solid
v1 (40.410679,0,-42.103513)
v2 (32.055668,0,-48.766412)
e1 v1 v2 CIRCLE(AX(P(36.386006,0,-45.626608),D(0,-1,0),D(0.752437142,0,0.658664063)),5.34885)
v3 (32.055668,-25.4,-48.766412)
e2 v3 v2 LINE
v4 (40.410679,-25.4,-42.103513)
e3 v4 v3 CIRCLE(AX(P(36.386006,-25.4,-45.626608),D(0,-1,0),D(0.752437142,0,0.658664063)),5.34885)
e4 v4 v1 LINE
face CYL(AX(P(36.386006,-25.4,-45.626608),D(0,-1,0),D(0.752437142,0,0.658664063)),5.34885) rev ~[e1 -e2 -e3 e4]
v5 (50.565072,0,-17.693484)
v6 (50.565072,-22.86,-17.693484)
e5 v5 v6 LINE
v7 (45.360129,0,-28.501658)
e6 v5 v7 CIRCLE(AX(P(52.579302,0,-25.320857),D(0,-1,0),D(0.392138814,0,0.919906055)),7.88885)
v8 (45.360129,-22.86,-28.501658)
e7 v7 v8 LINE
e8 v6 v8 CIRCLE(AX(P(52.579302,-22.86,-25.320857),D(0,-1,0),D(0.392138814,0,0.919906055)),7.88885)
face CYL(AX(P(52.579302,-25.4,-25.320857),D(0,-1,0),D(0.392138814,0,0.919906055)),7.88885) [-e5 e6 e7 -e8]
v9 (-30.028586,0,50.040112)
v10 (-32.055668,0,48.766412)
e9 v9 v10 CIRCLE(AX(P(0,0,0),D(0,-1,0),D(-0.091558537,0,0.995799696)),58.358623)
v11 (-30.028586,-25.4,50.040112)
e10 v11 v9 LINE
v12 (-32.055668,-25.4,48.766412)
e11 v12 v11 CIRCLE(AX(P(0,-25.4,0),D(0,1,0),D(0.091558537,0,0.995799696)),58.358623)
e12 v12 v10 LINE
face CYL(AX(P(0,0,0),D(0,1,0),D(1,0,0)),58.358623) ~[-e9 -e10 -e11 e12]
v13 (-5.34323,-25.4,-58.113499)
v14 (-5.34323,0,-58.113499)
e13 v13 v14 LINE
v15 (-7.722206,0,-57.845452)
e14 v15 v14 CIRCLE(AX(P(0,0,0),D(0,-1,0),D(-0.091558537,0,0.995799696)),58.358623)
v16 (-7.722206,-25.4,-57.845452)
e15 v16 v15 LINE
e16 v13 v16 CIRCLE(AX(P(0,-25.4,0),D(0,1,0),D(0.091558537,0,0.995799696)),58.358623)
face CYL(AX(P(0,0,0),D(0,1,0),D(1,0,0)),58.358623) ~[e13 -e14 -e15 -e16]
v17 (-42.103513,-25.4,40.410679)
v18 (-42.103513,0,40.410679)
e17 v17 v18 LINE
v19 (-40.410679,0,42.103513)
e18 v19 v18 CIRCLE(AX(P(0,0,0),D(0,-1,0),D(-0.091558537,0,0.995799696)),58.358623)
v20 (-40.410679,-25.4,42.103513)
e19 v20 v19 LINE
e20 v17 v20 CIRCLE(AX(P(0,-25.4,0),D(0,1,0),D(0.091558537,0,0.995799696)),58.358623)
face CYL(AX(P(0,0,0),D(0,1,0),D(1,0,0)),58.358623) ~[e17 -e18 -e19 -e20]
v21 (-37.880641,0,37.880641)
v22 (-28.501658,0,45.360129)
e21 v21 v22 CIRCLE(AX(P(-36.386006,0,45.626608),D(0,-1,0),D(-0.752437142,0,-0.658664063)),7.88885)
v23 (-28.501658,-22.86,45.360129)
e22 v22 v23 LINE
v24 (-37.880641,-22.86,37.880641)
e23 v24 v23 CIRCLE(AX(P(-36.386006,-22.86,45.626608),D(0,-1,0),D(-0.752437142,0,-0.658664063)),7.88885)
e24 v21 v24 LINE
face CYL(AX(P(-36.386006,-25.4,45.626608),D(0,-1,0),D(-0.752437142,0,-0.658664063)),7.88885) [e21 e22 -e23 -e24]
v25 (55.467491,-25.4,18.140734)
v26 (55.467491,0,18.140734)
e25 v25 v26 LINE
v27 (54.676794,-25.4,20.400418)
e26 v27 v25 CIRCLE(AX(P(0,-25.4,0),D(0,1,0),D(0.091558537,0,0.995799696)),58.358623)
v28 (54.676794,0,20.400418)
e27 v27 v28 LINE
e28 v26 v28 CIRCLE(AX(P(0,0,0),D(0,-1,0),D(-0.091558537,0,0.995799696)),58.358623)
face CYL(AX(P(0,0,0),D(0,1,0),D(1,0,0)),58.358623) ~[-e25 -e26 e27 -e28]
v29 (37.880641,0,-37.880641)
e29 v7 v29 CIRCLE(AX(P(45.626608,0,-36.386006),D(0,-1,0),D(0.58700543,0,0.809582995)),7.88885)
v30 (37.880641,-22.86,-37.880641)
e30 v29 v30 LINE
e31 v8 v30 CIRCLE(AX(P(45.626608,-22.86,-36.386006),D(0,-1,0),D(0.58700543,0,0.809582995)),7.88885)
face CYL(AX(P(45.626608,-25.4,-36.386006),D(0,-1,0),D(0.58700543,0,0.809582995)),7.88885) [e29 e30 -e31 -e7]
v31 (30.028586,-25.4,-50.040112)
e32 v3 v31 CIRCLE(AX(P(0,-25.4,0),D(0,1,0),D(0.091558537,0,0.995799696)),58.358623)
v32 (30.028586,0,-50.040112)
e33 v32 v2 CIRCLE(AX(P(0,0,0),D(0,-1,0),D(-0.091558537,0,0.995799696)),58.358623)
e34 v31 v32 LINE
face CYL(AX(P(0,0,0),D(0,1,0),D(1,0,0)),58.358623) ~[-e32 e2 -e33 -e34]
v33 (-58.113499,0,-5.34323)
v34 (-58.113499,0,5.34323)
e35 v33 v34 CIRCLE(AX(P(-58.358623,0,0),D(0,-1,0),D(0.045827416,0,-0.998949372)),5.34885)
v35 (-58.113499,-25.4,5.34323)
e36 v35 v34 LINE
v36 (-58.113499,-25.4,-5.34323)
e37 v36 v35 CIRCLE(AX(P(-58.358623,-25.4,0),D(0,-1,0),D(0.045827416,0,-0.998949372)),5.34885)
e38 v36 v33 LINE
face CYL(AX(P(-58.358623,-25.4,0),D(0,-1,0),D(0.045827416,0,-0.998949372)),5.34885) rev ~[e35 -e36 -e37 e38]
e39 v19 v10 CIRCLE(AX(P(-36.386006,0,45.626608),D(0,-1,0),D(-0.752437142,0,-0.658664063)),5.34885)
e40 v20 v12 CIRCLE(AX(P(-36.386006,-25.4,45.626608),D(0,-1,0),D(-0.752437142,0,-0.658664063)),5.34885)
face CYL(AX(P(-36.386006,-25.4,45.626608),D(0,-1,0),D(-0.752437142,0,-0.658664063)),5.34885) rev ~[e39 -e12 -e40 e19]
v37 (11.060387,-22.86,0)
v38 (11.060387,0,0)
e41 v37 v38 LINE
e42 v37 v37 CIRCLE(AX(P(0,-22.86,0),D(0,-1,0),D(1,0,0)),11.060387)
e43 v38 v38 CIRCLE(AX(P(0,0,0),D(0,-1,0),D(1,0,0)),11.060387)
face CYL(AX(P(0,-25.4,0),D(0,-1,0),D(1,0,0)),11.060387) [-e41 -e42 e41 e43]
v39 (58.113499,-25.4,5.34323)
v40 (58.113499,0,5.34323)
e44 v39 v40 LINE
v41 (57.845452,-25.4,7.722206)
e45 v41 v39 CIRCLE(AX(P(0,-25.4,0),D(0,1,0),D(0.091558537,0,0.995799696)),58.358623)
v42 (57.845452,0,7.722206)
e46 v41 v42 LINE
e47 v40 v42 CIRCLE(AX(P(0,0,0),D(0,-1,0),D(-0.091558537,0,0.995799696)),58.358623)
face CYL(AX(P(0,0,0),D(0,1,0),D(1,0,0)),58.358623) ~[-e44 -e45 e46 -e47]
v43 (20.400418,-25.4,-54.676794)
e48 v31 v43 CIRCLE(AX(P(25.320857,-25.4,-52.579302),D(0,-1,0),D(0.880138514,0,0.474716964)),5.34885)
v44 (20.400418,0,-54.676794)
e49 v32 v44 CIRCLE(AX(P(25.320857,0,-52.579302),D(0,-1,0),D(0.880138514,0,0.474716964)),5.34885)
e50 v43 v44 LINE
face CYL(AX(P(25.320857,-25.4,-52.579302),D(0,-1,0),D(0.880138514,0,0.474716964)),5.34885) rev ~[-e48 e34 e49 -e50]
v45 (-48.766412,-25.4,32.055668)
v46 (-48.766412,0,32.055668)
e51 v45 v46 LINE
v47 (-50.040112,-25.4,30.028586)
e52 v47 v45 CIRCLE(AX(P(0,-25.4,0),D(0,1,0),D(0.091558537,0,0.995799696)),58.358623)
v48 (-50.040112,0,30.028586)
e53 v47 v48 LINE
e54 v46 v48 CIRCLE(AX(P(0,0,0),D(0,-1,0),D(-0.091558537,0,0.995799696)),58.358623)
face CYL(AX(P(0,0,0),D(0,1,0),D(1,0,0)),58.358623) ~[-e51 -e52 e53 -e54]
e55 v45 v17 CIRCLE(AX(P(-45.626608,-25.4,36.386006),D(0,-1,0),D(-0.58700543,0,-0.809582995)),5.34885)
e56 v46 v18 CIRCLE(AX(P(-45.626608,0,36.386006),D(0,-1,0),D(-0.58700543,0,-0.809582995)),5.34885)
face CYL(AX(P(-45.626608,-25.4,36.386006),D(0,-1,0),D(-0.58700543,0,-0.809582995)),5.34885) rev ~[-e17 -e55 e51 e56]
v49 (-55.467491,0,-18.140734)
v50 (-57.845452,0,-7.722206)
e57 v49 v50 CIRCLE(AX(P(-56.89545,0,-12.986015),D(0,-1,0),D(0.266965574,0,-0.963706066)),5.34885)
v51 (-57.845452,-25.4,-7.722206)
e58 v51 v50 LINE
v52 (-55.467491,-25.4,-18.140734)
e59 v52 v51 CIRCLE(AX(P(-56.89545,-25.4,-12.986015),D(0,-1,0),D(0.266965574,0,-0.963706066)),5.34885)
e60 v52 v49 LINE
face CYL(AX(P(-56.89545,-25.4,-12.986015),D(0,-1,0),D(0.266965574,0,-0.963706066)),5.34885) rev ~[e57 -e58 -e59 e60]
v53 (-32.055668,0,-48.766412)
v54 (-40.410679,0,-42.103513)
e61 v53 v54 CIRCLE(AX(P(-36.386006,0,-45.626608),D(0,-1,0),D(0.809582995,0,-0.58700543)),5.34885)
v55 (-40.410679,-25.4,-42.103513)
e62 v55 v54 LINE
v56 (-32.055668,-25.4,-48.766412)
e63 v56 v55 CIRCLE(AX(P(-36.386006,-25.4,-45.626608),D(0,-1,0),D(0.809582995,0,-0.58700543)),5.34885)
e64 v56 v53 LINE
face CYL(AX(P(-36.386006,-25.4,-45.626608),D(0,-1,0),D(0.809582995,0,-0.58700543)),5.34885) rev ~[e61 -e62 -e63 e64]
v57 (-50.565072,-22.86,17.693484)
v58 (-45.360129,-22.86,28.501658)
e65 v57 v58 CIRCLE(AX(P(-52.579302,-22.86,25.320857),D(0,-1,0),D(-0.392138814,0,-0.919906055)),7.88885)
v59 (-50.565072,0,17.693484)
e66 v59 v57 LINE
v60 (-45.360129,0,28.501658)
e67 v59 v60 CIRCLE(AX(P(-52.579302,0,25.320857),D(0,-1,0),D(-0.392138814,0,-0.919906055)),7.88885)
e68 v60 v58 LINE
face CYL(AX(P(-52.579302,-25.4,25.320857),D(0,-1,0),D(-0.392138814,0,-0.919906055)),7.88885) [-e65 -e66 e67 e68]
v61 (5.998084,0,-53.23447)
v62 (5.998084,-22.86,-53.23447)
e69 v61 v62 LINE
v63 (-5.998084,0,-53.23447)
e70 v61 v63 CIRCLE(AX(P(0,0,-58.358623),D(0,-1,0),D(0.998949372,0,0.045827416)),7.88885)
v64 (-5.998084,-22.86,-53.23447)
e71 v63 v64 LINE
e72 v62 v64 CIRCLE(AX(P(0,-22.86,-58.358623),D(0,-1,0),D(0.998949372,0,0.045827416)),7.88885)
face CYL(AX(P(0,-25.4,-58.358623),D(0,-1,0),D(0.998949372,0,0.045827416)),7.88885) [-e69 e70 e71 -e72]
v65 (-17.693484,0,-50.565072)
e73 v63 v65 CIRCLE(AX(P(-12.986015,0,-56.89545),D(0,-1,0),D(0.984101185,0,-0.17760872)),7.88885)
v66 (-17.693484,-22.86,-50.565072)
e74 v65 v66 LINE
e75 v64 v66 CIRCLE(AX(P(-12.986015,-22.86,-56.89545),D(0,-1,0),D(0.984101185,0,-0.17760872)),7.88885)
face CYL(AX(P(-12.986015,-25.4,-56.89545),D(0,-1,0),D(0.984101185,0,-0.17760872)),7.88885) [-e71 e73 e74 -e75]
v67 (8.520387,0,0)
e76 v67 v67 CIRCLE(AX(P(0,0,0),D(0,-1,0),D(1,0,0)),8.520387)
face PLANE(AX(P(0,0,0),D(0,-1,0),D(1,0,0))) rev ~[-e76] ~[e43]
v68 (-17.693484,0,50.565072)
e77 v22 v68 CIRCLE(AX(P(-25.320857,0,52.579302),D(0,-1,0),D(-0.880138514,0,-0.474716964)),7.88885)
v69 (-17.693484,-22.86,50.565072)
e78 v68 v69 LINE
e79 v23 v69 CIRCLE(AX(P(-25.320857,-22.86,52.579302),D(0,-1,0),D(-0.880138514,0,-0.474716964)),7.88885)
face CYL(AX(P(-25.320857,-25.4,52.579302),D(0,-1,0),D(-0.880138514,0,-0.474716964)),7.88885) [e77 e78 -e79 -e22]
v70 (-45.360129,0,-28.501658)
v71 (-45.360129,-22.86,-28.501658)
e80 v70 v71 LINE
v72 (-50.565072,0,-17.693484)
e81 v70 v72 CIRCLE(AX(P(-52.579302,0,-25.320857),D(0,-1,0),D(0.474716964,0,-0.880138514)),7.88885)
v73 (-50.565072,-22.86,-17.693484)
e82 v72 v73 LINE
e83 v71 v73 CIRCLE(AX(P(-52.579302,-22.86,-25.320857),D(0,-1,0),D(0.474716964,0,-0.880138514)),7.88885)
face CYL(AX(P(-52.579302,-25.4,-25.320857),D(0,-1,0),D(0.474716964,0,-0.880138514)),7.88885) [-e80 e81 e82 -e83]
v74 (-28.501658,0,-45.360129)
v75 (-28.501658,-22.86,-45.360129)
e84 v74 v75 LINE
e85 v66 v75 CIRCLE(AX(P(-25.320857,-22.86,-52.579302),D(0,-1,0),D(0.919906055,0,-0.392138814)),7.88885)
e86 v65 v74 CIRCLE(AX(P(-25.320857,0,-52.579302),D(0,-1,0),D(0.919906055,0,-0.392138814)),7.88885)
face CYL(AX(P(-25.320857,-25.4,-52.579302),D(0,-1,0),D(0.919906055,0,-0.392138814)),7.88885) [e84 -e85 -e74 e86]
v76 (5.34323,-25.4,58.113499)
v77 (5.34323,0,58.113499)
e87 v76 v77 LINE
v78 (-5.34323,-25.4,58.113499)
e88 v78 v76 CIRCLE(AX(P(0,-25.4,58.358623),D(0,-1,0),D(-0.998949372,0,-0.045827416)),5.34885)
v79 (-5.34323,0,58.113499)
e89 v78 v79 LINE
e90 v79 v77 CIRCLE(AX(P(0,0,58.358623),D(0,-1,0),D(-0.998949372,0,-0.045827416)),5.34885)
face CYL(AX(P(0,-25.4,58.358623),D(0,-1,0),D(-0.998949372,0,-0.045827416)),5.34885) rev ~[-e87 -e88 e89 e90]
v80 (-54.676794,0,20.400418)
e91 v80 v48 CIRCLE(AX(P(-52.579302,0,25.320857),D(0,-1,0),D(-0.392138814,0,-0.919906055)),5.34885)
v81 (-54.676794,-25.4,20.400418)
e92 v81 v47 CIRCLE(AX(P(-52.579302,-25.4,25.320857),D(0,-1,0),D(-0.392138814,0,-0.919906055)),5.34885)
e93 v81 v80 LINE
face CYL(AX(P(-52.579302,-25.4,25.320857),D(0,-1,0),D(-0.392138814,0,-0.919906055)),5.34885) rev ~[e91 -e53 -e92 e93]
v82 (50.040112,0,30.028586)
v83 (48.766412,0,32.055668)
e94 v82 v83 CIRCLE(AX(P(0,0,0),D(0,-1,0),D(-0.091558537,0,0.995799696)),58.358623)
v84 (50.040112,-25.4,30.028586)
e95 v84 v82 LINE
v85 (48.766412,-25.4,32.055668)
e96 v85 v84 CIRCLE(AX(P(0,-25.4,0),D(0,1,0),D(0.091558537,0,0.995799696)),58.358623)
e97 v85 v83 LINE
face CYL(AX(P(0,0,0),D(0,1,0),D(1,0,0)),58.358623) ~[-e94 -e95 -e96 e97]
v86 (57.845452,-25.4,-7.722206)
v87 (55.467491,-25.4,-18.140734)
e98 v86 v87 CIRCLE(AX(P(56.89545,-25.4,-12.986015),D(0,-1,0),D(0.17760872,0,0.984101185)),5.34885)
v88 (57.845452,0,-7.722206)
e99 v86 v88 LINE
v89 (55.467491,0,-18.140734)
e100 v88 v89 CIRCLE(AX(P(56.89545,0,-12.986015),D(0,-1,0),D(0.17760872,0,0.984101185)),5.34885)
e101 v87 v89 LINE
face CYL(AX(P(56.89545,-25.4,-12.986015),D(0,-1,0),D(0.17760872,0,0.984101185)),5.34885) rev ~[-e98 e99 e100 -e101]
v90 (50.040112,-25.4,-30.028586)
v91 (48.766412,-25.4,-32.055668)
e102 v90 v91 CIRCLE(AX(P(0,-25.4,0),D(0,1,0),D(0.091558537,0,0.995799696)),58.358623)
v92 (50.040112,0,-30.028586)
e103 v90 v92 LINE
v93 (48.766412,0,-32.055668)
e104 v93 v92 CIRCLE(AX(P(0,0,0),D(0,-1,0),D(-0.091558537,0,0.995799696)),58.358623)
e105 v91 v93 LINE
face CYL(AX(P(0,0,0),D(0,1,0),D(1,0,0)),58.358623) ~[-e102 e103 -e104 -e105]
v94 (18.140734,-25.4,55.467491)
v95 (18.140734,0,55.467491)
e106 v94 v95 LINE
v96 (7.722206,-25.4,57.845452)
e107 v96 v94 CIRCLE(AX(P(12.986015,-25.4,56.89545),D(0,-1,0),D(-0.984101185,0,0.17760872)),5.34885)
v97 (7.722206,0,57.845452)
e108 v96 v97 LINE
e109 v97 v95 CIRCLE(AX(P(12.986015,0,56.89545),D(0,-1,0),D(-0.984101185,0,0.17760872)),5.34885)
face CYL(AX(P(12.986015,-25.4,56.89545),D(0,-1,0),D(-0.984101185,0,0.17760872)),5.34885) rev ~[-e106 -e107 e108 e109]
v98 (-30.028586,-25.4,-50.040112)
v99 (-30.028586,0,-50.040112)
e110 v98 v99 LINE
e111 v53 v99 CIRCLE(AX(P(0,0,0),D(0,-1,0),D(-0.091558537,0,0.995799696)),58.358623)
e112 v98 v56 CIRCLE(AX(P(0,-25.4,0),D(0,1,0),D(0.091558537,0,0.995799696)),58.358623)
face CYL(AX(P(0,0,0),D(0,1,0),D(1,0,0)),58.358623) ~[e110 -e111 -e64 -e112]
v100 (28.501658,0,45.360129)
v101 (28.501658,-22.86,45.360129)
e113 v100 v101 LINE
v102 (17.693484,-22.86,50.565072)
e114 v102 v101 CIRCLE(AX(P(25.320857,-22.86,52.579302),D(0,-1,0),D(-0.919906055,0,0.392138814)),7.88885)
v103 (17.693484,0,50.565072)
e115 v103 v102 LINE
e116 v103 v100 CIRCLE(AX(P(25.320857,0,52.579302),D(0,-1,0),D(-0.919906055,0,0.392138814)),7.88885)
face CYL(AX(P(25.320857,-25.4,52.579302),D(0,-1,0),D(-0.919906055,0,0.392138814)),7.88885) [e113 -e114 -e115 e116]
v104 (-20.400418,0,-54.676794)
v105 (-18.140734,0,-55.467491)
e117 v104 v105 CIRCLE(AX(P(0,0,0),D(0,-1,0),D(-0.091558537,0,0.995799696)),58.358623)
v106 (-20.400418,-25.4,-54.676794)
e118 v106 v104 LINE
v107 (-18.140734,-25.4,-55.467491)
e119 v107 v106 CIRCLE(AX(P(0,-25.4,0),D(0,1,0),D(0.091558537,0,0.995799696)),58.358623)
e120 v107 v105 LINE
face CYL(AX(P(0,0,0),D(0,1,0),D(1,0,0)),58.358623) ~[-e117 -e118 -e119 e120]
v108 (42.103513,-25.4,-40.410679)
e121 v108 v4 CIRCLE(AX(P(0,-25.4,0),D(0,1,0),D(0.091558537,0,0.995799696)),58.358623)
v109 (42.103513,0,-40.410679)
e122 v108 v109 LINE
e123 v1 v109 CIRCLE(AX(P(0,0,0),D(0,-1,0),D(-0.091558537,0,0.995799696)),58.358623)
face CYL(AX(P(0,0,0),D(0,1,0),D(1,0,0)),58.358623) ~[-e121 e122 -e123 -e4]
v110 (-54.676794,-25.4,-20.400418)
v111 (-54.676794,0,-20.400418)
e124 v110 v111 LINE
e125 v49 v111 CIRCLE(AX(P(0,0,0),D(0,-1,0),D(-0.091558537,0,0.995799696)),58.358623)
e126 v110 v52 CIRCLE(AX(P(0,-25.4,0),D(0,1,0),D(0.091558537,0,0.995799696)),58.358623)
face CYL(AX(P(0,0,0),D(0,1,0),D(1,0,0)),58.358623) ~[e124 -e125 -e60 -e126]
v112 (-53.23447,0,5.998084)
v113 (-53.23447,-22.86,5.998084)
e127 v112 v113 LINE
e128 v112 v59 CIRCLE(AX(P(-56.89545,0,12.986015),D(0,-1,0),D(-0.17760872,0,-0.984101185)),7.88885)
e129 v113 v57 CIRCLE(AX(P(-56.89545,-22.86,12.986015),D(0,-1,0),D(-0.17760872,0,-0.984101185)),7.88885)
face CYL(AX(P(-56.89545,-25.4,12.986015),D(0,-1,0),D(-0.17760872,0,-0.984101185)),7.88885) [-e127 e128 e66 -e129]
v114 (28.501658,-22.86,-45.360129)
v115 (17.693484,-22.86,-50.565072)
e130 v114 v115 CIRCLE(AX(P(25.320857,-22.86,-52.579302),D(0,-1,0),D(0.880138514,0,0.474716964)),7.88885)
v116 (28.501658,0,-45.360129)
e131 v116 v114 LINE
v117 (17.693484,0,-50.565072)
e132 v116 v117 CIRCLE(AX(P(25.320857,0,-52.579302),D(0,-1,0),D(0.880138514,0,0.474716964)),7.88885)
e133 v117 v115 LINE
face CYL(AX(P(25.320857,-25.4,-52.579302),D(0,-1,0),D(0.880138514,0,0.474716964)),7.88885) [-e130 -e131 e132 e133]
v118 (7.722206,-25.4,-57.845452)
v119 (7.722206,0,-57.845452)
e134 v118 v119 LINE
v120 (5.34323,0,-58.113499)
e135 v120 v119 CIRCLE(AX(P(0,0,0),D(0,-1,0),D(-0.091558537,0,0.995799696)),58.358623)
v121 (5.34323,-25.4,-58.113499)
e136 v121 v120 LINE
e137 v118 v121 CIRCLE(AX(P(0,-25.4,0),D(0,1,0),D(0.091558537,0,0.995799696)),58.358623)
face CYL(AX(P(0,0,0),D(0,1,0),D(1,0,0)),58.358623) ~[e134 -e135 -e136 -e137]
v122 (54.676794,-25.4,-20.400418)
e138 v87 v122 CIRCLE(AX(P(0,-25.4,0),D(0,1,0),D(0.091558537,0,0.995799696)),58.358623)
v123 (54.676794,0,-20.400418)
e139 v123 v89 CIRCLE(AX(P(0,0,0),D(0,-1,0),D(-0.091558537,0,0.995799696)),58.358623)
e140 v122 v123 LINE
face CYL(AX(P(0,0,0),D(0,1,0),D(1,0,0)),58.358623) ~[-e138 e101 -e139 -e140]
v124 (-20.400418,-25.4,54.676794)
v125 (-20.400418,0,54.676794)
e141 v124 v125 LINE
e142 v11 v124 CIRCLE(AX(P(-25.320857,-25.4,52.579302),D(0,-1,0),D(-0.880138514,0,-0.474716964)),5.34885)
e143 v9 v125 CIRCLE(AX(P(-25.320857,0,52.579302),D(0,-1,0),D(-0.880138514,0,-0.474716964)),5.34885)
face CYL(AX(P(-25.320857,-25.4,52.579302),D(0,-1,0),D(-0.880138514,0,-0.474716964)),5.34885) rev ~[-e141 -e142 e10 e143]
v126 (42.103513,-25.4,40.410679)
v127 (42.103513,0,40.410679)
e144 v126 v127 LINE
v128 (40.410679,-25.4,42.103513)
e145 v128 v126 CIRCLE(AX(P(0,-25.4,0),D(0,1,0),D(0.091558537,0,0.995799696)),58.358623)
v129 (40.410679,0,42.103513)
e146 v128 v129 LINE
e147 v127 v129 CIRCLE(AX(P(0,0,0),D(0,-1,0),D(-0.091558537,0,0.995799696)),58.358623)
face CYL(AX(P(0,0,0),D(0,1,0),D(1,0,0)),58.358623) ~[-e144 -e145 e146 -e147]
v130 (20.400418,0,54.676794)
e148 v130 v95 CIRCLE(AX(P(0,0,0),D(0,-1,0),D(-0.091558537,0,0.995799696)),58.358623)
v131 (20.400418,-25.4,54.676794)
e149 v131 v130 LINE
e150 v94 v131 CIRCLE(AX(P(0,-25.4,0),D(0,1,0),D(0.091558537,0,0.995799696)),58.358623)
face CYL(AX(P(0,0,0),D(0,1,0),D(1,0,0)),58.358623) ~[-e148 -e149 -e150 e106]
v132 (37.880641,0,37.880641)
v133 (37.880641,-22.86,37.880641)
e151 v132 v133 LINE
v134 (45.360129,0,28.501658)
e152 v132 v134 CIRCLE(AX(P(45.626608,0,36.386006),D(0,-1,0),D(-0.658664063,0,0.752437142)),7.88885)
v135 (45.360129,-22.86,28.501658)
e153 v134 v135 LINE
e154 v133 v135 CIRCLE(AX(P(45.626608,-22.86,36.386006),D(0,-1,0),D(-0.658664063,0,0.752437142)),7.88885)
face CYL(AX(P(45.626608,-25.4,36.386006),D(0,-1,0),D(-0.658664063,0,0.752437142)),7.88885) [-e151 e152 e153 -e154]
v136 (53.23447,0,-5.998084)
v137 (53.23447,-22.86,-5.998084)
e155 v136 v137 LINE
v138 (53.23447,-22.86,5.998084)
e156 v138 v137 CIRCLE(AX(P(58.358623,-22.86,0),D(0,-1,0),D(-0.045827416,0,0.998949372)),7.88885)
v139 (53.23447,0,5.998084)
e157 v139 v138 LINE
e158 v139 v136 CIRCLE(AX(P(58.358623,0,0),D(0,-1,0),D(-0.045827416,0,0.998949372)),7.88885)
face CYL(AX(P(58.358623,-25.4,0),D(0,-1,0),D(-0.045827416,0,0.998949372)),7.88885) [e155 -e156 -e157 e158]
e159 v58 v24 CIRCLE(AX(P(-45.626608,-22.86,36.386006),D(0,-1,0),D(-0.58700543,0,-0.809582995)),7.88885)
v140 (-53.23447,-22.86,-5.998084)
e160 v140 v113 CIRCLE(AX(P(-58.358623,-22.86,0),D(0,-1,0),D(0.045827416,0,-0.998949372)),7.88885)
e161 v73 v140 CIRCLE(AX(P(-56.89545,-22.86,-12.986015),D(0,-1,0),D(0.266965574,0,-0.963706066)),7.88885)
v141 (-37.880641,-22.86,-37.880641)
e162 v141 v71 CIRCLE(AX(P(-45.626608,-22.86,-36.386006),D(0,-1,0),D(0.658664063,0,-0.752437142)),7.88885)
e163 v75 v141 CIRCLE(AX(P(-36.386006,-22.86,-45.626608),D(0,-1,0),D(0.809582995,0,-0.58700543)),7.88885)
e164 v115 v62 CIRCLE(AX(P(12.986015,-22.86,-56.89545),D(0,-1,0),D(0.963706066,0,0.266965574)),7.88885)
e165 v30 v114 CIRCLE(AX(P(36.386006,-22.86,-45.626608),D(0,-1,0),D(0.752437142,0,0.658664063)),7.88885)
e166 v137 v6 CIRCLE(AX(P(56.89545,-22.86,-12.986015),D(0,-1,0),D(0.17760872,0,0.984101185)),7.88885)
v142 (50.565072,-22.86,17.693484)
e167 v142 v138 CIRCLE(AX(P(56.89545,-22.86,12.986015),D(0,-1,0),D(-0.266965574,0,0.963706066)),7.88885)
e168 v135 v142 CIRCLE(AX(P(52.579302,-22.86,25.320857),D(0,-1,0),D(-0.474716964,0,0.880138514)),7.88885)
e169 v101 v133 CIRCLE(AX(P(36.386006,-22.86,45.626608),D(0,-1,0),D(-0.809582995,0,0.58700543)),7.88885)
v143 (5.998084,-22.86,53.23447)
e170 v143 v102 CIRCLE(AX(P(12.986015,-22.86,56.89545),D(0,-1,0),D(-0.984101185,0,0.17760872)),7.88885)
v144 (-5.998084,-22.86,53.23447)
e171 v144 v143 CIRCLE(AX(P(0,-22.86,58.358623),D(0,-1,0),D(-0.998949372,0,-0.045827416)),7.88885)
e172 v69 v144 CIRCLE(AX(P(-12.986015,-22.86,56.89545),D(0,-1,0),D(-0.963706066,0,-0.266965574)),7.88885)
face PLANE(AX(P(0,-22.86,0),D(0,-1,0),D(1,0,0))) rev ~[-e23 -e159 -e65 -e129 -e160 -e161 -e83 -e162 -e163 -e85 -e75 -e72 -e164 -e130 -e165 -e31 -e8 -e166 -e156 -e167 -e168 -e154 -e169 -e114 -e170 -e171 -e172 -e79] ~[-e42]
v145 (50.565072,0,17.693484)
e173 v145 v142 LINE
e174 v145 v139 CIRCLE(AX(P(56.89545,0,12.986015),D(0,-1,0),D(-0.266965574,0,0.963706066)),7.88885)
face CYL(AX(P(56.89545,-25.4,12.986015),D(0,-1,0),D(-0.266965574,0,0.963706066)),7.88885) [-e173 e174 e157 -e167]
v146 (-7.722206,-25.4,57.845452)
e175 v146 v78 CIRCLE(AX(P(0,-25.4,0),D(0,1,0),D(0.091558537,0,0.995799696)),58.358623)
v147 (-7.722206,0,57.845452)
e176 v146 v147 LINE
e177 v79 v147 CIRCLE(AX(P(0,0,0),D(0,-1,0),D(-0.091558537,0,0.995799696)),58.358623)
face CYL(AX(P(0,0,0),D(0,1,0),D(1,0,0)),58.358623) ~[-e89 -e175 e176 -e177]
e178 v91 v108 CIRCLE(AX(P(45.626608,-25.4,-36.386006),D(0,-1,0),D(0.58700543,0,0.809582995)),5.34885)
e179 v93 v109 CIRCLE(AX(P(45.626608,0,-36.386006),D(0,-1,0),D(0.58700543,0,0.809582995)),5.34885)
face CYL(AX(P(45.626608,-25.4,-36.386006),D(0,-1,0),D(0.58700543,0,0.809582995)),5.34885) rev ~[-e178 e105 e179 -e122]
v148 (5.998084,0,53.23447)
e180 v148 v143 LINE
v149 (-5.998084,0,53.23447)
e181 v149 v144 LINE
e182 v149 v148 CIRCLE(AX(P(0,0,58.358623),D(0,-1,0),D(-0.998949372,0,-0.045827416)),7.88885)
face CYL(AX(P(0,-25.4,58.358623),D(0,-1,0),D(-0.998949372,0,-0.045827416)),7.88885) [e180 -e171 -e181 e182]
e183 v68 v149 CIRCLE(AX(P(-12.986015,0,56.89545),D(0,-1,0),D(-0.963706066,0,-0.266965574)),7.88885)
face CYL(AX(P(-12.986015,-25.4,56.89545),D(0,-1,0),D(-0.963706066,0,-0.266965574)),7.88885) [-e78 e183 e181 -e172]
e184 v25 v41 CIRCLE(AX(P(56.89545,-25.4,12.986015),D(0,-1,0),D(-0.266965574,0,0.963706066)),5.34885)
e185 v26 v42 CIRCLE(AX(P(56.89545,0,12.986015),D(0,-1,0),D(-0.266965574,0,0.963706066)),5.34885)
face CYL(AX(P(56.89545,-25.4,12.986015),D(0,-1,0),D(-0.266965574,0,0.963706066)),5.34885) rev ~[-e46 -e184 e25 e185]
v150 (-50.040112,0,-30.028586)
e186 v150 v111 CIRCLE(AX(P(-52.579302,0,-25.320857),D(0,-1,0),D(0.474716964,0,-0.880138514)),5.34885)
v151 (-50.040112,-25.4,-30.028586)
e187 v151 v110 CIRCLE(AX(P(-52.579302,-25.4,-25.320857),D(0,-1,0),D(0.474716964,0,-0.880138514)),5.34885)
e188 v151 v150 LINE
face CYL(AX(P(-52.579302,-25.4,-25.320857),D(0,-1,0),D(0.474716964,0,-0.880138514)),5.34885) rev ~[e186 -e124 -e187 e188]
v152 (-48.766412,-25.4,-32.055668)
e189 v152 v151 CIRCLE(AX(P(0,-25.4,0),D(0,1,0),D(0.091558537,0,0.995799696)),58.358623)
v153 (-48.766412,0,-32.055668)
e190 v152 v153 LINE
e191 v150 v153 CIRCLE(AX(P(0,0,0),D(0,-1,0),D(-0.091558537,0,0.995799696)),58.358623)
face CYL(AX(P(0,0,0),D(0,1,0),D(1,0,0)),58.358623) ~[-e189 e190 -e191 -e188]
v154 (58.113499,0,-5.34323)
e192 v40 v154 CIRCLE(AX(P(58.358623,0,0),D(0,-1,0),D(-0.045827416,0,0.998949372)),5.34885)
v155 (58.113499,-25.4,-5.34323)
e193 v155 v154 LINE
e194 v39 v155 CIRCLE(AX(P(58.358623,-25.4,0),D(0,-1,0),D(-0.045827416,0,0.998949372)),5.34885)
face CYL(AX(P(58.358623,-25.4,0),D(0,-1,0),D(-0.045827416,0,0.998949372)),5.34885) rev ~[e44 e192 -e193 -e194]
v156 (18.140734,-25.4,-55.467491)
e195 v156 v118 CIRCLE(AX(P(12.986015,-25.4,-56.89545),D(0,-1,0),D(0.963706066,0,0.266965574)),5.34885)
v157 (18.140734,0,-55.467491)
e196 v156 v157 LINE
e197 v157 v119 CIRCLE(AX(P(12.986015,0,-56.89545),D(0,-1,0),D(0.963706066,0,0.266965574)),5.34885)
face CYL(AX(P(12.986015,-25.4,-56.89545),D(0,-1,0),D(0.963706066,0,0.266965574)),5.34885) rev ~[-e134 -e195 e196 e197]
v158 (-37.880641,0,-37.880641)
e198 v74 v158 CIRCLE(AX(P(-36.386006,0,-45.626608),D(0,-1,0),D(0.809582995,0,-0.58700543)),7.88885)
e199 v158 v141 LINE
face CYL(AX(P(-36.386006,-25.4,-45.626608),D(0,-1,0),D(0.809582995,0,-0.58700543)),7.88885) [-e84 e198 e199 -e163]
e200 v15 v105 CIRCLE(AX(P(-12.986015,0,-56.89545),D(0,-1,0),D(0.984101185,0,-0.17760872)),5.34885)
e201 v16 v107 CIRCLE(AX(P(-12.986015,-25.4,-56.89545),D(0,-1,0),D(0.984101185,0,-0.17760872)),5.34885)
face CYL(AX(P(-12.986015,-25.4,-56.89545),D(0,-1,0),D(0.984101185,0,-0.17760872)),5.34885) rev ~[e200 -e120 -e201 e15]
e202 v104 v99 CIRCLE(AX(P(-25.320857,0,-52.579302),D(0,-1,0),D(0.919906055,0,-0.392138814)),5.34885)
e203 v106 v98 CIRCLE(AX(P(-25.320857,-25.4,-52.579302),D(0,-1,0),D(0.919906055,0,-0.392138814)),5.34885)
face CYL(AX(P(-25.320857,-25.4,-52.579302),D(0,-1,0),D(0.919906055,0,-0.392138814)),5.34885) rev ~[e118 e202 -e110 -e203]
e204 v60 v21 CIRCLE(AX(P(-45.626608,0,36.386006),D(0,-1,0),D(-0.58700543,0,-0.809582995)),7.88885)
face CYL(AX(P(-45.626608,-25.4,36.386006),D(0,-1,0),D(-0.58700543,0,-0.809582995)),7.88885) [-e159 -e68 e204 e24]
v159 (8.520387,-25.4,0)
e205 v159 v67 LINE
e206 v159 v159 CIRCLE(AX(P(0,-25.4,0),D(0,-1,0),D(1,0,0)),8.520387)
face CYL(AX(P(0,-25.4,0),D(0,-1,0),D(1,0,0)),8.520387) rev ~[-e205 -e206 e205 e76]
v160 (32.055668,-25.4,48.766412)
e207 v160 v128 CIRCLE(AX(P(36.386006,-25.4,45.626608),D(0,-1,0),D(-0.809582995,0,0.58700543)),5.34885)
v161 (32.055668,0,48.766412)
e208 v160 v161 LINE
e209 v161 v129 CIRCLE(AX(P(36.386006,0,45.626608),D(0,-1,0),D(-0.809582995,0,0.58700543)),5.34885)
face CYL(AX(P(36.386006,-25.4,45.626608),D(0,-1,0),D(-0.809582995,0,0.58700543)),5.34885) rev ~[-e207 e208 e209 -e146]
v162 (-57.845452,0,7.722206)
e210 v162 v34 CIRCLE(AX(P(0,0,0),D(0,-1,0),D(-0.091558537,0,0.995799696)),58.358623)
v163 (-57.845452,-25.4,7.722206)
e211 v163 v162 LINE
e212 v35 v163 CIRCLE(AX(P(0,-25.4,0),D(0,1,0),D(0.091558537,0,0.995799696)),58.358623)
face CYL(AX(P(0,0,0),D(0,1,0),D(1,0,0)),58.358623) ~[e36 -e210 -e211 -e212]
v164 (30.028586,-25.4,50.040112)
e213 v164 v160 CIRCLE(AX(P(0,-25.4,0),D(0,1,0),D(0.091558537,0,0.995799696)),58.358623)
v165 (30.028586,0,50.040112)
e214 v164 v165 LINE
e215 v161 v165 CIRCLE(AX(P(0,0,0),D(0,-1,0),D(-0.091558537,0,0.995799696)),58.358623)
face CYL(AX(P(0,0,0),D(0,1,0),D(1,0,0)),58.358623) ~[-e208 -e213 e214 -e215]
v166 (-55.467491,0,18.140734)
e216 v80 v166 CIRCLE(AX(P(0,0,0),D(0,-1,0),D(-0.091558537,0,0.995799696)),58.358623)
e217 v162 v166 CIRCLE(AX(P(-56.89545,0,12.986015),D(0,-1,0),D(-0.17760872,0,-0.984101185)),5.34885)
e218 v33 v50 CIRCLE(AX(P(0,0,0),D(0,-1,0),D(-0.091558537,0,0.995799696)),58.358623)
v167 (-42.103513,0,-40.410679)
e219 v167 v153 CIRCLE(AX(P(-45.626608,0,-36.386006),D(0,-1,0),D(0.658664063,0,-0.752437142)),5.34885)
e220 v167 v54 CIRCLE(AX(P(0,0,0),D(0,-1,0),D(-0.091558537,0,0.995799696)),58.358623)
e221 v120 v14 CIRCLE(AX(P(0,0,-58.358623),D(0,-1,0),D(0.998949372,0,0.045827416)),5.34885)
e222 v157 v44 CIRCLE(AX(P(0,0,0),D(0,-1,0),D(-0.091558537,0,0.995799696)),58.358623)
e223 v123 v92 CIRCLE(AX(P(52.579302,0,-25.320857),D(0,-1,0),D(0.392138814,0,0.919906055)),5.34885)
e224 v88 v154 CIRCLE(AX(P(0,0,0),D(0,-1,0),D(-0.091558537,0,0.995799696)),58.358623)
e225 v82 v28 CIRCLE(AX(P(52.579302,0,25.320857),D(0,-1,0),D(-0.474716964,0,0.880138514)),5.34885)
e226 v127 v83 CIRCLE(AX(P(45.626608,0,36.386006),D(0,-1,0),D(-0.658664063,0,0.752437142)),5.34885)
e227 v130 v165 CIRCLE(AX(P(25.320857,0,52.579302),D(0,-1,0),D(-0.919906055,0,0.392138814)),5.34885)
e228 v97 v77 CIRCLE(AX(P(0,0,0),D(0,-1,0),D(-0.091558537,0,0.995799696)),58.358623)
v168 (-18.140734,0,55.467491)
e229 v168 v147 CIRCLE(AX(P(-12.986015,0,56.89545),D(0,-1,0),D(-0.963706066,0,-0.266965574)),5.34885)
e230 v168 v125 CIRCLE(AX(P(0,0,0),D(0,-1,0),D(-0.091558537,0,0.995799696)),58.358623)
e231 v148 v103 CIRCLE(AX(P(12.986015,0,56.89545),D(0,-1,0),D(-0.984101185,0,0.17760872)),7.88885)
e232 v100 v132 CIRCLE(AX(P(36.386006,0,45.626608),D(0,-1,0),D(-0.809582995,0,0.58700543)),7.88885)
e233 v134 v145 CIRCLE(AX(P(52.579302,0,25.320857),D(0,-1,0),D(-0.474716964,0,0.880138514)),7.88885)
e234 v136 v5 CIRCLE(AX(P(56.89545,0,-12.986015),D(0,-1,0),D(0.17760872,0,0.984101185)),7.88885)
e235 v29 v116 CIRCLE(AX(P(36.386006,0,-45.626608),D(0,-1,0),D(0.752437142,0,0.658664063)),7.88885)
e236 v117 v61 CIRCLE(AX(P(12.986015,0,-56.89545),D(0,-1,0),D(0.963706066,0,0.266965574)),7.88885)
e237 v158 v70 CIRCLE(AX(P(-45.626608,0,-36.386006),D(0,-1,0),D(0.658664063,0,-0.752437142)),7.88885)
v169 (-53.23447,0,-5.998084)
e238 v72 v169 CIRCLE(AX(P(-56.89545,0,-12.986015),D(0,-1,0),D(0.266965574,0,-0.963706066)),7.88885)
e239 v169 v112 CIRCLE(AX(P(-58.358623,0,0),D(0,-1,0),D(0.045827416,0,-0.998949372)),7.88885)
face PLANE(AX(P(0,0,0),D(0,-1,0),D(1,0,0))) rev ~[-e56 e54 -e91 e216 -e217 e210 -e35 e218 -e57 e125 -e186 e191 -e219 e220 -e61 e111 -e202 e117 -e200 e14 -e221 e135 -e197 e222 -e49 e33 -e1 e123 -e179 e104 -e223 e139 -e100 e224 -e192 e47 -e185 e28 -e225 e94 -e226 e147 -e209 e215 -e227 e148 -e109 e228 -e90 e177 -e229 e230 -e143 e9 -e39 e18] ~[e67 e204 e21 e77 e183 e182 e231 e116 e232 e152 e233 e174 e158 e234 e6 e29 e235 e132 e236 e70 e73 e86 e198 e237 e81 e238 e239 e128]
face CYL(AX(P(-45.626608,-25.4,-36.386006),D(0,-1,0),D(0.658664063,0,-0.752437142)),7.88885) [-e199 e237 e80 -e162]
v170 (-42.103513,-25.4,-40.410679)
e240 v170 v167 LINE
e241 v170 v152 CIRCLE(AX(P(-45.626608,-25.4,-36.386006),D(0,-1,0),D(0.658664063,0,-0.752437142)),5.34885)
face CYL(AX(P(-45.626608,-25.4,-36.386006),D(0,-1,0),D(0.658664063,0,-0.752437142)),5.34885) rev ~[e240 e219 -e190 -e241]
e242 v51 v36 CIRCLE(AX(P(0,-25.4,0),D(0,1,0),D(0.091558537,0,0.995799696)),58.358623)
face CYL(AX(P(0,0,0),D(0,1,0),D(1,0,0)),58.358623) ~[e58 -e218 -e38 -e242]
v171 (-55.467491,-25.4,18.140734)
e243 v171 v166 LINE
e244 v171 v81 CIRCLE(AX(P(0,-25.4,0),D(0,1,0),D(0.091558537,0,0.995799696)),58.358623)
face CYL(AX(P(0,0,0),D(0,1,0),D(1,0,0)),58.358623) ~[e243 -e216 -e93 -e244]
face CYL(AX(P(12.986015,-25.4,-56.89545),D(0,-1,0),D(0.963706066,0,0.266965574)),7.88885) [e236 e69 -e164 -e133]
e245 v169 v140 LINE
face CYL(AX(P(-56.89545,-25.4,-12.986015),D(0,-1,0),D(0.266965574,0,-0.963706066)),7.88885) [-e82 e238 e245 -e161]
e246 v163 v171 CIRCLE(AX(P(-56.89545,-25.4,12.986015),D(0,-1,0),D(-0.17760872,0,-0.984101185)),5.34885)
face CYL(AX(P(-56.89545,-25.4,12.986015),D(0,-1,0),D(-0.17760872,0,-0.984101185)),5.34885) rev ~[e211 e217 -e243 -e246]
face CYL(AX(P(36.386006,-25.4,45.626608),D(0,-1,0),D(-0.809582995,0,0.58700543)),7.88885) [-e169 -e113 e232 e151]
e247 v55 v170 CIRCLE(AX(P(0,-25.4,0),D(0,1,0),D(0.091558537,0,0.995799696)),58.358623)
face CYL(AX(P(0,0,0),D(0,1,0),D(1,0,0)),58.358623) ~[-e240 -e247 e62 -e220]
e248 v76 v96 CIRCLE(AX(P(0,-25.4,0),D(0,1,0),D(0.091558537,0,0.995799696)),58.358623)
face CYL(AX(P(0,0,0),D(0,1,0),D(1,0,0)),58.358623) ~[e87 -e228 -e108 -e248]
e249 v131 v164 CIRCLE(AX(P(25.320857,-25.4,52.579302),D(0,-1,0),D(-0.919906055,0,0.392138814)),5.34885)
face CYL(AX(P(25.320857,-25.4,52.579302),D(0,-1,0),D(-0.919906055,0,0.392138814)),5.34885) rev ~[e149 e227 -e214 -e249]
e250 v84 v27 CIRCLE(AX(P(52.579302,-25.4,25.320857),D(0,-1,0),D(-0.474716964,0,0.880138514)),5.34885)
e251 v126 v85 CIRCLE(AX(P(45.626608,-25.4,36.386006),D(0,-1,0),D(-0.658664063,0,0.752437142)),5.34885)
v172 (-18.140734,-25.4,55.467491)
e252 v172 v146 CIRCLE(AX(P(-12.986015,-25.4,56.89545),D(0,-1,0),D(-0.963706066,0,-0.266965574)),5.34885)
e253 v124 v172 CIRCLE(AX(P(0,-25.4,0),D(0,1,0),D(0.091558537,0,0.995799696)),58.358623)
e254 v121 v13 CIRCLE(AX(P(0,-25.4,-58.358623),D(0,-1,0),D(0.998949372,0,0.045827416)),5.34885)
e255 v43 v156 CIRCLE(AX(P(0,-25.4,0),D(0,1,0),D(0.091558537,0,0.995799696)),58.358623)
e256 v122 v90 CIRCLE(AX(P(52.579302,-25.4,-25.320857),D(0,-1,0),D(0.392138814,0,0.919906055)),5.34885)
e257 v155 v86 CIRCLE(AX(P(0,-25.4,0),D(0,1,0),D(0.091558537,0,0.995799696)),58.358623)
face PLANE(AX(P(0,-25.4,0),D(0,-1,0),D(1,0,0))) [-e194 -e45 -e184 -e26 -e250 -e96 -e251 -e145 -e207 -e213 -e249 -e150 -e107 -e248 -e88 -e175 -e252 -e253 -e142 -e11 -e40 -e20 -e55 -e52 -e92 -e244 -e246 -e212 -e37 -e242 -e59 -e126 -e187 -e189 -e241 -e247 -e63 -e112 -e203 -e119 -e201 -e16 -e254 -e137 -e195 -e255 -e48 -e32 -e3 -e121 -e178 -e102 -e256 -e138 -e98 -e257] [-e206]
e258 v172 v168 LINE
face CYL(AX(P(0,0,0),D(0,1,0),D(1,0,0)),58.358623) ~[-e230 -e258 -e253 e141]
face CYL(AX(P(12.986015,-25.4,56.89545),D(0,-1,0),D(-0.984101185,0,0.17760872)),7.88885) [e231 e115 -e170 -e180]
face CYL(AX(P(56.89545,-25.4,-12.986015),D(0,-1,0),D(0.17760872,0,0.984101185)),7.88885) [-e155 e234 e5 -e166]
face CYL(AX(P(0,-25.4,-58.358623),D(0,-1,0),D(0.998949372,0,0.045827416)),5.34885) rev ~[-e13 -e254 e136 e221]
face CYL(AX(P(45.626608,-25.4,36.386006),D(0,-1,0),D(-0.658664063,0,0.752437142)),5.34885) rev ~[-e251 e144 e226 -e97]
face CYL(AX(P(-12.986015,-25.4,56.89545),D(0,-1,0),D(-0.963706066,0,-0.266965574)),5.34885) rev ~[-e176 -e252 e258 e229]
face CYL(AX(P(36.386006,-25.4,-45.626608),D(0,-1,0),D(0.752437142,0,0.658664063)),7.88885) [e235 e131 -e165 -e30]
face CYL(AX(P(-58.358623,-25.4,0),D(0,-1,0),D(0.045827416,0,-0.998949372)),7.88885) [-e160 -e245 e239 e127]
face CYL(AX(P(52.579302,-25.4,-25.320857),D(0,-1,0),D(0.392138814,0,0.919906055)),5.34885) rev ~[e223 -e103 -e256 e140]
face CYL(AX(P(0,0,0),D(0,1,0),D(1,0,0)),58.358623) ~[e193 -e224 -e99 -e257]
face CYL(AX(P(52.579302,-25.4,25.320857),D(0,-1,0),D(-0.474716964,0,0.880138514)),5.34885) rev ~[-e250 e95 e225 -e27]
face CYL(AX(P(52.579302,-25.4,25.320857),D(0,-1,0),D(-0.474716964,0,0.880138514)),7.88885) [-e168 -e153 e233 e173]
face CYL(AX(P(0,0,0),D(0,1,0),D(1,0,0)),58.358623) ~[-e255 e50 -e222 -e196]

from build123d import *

# Parameters (mm, degrees)
F0_R            = 58.3586225364
F1_DEPTH        = 25.4
F3_DEPTH        = 25.401
F3_COPIES_COUNT = 28
F5_R            = 8.5203865575
F6_DEPTH        = 25.401
F7_T            = -2.54


# Not quite as in the source:
# - a feature of the source that left no trace in its solid (it failed there, or was rolled back) is left out
# - a pattern or mirror of a feature is missing from the dataset's text; its kind, count and spacing are read off the source's solid


with BuildPart() as f1:
    # F0 (on Front) → F1 (new body)
    with BuildSketch(Plane.XZ):
        Circle(F0_R)
    extrude(amount=F1_DEPTH)

    # F2 (on face) → F3 (cut, through all)
    with BuildSketch(Plane.XZ.offset(25.4)):
        with BuildLine():
            ThreePointArc((5.3432300873, 58.1134985746), (0, 58.3586225364), (-5.3432300873, 58.1134985746))
            ThreePointArc((-5.3432300873, 58.1134985746), (0, 53.0097727981), (5.3432300873, 58.1134985746))
        make_face()
    f3 = extrude(amount=-F3_DEPTH, mode=Mode.SUBTRACT)

    # F3_copies: F3 ×28 about axis
    f3_copies_axis = Axis((0, 0, 0), (0, 1, 0))
    for i in range(1, F3_COPIES_COUNT):
        add(f3.rotate(f3_copies_axis, i * 360 / F3_COPIES_COUNT), mode=Mode.SUBTRACT)

    # F5 (on face) → F6 (cut, through all)
    with BuildSketch(Plane.XZ.offset(25.4)):
        Circle(F5_R)
    extrude(amount=-F6_DEPTH, mode=Mode.SUBTRACT)

    # F7
    f7_openings = [f1.faces().sort_by_distance(p)[0] for p in [
        (0, 0, 51.366075),
    ]]
    offset(amount=F7_T, openings=f7_openings)


solid = f1.part
